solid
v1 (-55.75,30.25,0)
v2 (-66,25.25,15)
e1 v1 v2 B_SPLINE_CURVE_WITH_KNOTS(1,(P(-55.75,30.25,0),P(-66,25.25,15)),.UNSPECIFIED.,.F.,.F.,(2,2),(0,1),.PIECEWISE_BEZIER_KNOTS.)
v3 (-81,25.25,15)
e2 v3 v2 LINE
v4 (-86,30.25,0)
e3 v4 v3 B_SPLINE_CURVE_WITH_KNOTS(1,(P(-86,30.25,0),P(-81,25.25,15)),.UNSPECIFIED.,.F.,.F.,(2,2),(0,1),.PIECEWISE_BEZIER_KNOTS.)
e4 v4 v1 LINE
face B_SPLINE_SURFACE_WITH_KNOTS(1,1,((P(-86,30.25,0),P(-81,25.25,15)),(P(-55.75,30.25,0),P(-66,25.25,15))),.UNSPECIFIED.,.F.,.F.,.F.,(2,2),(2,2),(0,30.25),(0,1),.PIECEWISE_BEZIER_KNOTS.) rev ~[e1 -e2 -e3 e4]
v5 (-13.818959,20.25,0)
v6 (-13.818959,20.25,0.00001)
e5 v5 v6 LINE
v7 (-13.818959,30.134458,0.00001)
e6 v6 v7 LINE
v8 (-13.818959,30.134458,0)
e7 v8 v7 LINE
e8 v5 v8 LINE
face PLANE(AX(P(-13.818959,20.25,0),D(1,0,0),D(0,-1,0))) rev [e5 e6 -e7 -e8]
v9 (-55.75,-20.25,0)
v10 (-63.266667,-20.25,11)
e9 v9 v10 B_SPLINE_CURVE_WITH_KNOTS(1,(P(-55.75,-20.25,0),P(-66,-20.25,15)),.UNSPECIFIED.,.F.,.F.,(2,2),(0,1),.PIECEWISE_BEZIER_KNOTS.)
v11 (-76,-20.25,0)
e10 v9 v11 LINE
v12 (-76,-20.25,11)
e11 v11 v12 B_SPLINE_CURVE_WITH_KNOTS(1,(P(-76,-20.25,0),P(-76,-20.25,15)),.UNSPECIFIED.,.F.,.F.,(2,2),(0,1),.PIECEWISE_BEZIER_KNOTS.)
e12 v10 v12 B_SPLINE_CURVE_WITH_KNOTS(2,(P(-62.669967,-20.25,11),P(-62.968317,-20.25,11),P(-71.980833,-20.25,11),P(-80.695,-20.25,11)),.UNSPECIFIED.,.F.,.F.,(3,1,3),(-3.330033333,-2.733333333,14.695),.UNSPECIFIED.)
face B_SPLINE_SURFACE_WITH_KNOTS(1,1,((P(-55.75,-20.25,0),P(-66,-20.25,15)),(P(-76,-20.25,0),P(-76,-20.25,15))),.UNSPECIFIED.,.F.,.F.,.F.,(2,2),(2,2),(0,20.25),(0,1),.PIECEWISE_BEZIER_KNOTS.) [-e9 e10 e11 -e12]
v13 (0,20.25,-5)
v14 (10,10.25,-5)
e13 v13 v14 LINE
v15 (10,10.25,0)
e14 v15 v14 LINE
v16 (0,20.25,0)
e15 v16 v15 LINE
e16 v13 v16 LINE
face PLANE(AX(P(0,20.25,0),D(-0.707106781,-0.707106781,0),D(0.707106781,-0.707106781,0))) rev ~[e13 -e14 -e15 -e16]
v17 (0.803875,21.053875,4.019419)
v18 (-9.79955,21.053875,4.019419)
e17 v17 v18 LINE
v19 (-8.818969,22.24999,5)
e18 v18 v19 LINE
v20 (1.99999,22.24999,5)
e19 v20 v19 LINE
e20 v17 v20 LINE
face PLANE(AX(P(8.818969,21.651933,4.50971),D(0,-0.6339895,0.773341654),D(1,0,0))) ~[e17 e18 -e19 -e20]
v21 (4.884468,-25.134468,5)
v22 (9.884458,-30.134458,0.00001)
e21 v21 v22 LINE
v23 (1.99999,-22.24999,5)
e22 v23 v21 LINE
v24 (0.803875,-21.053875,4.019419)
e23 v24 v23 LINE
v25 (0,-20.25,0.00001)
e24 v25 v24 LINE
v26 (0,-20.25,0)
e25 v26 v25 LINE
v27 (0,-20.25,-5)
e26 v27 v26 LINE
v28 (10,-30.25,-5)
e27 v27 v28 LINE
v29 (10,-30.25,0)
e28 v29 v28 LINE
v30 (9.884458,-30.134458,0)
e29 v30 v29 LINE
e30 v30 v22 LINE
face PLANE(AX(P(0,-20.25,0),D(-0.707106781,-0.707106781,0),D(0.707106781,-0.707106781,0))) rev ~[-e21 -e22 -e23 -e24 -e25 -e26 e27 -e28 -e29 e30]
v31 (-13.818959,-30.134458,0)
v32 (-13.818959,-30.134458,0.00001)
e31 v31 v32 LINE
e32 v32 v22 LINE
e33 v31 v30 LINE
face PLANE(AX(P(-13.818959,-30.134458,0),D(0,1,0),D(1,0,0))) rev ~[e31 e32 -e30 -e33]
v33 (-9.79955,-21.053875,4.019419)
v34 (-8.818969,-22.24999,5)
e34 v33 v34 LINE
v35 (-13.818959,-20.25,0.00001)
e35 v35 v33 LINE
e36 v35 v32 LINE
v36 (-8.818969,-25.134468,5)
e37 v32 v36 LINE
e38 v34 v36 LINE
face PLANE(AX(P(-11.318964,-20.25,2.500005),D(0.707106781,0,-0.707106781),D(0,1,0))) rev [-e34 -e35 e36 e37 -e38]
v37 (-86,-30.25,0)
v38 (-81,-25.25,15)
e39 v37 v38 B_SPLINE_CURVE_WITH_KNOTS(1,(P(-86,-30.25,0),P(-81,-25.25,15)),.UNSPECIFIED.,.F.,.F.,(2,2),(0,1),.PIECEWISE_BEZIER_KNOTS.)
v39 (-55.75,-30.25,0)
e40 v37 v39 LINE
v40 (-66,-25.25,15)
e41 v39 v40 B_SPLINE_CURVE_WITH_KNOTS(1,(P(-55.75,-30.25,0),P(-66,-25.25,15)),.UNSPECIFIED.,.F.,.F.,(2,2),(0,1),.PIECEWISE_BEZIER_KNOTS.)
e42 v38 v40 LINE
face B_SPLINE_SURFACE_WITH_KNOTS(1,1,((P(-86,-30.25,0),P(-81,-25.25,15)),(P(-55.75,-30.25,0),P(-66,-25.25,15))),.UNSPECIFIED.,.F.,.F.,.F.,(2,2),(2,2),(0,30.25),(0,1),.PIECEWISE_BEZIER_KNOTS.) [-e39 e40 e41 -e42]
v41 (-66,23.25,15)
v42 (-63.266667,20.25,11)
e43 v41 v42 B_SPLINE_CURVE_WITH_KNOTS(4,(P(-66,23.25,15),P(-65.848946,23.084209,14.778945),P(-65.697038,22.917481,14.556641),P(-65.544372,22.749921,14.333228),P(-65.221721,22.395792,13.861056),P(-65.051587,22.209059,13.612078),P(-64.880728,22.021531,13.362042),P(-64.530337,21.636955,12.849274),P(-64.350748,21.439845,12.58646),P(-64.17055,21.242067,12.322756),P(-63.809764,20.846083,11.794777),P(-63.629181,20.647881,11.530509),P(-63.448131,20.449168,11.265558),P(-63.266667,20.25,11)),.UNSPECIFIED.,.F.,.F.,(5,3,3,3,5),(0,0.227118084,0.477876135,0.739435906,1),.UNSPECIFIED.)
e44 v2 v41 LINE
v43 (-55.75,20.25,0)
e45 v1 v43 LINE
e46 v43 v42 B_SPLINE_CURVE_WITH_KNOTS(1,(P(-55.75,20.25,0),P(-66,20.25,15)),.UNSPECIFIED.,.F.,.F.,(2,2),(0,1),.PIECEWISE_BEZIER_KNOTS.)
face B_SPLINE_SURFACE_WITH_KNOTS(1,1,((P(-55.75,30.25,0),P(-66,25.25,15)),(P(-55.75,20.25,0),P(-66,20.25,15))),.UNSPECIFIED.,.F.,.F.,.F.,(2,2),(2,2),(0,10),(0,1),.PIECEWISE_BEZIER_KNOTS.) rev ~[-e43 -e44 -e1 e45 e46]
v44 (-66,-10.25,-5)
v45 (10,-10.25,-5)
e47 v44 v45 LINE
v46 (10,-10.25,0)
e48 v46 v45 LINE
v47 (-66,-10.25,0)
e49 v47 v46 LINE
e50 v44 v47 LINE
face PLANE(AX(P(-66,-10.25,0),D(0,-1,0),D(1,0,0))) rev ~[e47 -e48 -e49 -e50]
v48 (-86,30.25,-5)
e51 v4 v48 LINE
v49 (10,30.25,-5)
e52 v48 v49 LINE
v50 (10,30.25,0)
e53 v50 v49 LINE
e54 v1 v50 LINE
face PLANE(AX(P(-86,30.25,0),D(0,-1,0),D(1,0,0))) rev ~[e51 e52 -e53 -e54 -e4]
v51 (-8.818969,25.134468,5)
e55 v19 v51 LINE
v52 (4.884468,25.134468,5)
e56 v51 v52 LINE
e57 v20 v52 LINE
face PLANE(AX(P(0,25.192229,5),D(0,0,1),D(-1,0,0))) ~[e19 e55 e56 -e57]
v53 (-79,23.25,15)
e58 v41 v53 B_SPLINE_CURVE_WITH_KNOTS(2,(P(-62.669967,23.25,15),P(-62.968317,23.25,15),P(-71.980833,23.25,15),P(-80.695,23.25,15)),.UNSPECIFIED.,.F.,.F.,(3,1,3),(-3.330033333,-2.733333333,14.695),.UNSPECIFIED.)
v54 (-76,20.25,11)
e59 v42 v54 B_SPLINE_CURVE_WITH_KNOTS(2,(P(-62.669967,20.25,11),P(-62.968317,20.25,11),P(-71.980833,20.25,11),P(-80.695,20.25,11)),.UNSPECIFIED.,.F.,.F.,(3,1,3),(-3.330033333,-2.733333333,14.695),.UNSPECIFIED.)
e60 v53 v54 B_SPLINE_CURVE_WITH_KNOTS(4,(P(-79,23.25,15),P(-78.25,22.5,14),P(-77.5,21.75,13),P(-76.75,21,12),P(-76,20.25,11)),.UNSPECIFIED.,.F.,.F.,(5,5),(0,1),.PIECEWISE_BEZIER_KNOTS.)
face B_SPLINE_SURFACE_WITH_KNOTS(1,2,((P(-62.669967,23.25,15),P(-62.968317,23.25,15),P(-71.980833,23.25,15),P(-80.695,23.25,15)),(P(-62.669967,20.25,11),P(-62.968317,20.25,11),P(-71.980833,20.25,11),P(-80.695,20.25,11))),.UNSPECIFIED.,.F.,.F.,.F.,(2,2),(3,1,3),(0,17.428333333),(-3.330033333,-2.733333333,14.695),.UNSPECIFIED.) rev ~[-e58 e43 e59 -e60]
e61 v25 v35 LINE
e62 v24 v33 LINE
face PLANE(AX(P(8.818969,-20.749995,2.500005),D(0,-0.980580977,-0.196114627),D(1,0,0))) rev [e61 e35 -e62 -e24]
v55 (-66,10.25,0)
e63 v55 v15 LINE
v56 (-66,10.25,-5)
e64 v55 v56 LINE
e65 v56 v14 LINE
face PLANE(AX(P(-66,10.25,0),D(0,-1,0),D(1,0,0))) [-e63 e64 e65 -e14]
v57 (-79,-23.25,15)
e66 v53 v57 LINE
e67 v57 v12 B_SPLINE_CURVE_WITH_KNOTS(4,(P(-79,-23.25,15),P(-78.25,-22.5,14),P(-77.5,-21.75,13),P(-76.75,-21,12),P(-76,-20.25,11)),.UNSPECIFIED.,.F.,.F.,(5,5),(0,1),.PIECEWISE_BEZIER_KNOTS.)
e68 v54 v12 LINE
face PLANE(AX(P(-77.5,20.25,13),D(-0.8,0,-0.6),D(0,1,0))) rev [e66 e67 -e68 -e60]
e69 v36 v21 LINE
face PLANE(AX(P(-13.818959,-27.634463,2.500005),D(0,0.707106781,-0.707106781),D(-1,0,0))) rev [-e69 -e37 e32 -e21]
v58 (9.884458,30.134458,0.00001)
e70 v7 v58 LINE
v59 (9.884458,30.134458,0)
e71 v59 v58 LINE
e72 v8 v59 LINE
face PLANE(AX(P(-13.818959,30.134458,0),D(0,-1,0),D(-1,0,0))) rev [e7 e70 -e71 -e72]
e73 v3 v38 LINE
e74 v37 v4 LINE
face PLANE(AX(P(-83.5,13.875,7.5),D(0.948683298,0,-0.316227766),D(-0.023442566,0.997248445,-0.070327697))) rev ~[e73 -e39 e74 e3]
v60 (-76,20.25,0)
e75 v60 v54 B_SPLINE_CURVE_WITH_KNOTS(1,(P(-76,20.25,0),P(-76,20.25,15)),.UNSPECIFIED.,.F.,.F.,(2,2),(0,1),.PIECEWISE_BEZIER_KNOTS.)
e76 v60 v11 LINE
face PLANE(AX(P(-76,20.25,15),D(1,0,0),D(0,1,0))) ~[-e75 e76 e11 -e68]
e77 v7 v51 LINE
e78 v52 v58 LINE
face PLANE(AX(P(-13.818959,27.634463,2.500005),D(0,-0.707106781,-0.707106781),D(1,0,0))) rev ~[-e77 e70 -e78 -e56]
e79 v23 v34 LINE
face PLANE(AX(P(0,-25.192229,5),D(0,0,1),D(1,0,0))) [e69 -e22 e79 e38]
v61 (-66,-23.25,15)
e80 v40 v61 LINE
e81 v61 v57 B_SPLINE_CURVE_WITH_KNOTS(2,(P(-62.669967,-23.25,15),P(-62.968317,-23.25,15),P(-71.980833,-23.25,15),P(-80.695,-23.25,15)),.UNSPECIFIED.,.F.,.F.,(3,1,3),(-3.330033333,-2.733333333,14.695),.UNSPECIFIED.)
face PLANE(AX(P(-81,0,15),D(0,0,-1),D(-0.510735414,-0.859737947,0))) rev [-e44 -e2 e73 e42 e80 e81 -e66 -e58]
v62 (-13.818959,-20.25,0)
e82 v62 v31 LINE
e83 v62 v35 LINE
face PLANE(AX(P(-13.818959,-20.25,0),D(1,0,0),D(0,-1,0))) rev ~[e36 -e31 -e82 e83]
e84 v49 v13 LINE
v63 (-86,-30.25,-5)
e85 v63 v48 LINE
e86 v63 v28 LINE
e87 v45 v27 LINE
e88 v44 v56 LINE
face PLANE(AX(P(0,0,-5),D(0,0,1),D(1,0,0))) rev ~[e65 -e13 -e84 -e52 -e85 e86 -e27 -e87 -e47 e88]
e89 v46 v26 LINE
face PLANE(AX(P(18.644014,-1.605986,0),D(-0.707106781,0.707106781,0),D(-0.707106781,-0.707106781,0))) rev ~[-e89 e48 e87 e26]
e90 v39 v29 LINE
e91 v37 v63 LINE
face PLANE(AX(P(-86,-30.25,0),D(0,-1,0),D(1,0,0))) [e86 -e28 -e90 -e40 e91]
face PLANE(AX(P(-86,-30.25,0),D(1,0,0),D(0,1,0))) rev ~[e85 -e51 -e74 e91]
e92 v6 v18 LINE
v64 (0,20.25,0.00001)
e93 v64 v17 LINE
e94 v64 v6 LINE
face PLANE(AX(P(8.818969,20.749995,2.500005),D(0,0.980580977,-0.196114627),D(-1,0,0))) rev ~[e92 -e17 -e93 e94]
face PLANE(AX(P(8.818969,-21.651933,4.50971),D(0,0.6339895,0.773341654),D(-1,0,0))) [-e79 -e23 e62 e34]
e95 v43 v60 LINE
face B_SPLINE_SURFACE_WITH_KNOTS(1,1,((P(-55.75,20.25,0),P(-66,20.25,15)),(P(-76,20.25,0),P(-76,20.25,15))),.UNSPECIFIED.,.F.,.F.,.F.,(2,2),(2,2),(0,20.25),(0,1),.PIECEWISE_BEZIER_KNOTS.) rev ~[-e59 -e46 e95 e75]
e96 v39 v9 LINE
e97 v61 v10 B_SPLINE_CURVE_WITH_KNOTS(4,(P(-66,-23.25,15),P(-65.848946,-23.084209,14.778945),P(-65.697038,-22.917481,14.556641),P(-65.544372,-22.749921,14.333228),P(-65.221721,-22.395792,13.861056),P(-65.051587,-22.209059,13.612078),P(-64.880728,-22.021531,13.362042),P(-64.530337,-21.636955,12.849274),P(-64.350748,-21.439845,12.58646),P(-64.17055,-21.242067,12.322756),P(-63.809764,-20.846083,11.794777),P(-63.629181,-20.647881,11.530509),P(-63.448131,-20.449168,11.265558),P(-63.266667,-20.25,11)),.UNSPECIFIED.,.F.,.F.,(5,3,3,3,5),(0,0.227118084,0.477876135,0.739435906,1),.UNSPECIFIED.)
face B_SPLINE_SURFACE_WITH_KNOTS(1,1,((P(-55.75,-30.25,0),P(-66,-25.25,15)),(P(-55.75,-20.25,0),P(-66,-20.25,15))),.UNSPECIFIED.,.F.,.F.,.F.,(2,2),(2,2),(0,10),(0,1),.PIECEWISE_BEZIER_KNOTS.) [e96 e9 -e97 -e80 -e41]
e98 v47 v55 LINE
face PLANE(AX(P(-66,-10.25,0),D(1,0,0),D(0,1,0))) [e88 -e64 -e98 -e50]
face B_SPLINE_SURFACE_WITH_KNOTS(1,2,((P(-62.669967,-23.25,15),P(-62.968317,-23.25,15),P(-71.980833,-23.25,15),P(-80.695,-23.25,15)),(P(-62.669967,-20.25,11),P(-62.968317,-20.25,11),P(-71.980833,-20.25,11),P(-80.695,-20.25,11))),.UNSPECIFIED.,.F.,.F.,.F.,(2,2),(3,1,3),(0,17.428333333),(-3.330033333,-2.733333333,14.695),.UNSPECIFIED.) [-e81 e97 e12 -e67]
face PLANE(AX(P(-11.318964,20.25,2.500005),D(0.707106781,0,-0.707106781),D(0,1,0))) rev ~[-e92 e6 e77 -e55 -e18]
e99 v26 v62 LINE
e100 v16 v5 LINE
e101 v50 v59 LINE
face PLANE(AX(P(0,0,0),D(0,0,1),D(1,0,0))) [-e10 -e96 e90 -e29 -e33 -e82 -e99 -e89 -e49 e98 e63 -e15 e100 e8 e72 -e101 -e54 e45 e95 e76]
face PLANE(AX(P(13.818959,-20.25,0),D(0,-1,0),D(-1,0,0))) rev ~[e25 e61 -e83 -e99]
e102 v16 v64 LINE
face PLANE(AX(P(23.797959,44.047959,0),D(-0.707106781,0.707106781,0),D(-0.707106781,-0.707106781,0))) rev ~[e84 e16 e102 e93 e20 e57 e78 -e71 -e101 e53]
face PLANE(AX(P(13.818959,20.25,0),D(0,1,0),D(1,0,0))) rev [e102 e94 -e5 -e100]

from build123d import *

# Parameters (mm, degrees)
F0_W           = 172
F0_H           = 60.5
F4_DEPTH       = 5
F6_SIZE2       = 4
F6_SIZE        = 3
F9_DEPTH       = 5
F10_SIZE       = 4.99999
F11_SIZE2      = 0.99999
F11_SIZE       = 4.99999
F12_SIZE       = 1
F14_W          = 132
F14_H          = 20.5
F15_DEPTH      = 12.5
F17_DEPTH      = 25
F17_DEPTH_BACK = 25


# Not quite as in the source:
# - a fillet or chamfer is up to 0.001 mm smaller than in the source, because OpenCascade refuses the exact size


with BuildPart() as f4:
    # F0 (on Top) → F4 (new body)
    with BuildSketch(Plane.XY):
        Rectangle(F0_W, F0_H)
    extrude(amount=-F4_DEPTH)

    # F3 (on Top) → F5 section 0
    with BuildSketch(Plane.XY):
        Polygon((-86, 0), (-86, -30.25), (-55.75, -30.25), (-55.75, -20.25), (-76, -20.25), (-76, 0), align=None)
    # F2 (on offset) → F5 section 1
    with BuildSketch(Plane.XY.offset(15)):
        Polygon((-76, -20.25), (-76, 0), (-81, 0), (-81, -25.25), (-66, -25.25), (-66, -20.25), align=None)
    loft()

    # F6
    f6_edges = [f4.edges().sort_by_distance(p)[0] for p in [
        (-76, -10.125, 15),
        (-71, -20.25, 15),
    ]]
    chamfer(f6_edges, length=F6_SIZE, length2=F6_SIZE2)

    # F7: F4 across plane


with BuildPart() as f4_1:
    add(f4.part)
    add(f4.part.mirror(Plane.YZ))

    # F8 (on face) → F9 (join)
    with BuildSketch(Plane.XY):
        Polygon((13.8189587742, -20.25), (0, -20.25), (-13.8189587742, -20.25), (-13.8189587742, -30.1344580948), (0, -30.1344580948), (13.8189587742, -30.1344580948), align=None)
    extrude(amount=F9_DEPTH)

    # F10 (size 5 in the source; OpenCascade refuses exactly that, so slightly less here)
    f10_edges = [f4_1.edges().sort_by_distance(p)[0] for p in [
        (13.818959, -25.192229, 5),
        (0, -30.134458, 5),
        (-13.818959, -25.192229, 5),
    ]]
    chamfer(f10_edges, length=F10_SIZE)

    # F11 (size 5 and 1 in the source; OpenCascade refuses exactly that, so slightly less here)
    f11_edges = [f4_1.edges().sort_by_distance(p)[0] for p in [
        (0, -20.25, 5),
    ]]
    f11_side = f4_1.faces().sort_by_distance((0, -20.25, 2.315943))[0]
    chamfer(f11_edges, length=F11_SIZE, length2=F11_SIZE2, reference=f11_side)

    # F12
    f12_edges = [f4_1.edges().sort_by_distance(p)[0] for p in [
        (0, -21.24999, 5),
    ]]
    chamfer(f12_edges, length=F12_SIZE)

    # F13: F4 across plane


with BuildPart() as f4_2:
    add(f4_1.part)
    add(f4_1.part.mirror(Plane.XZ))

    # F14 (on Top) → F15 (cut, symmetric)
    with BuildSketch(Plane.XY):
        Rectangle(F14_W, F14_H)
    extrude(amount=F15_DEPTH, both=True, mode=Mode.SUBTRACT)


with BuildPart() as f17:
    # F16 (on Top) → F17 (new body, two sides)
    with BuildSketch(Plane.XY) as f17_sk:
        Polygon((23.7979591321, 44.0479591321), (0, 20.25), (18.644013716, 1.605986284), (18.644013716, -1.605986284), (0, -20.25), (26.894013716, -47.144013716), (91.0670285058, -47.144013716), (91.0670285058, 44.0479591321), align=None)
    extrude(amount=F17_DEPTH)
    extrude(f17_sk.sketch, amount=-F17_DEPTH_BACK)


with BuildPart() as f4_3:
    add(f4_2.part)

    # F18: cut F17
    add(f17.part, mode=Mode.SUBTRACT)


solid = f4_3.part
